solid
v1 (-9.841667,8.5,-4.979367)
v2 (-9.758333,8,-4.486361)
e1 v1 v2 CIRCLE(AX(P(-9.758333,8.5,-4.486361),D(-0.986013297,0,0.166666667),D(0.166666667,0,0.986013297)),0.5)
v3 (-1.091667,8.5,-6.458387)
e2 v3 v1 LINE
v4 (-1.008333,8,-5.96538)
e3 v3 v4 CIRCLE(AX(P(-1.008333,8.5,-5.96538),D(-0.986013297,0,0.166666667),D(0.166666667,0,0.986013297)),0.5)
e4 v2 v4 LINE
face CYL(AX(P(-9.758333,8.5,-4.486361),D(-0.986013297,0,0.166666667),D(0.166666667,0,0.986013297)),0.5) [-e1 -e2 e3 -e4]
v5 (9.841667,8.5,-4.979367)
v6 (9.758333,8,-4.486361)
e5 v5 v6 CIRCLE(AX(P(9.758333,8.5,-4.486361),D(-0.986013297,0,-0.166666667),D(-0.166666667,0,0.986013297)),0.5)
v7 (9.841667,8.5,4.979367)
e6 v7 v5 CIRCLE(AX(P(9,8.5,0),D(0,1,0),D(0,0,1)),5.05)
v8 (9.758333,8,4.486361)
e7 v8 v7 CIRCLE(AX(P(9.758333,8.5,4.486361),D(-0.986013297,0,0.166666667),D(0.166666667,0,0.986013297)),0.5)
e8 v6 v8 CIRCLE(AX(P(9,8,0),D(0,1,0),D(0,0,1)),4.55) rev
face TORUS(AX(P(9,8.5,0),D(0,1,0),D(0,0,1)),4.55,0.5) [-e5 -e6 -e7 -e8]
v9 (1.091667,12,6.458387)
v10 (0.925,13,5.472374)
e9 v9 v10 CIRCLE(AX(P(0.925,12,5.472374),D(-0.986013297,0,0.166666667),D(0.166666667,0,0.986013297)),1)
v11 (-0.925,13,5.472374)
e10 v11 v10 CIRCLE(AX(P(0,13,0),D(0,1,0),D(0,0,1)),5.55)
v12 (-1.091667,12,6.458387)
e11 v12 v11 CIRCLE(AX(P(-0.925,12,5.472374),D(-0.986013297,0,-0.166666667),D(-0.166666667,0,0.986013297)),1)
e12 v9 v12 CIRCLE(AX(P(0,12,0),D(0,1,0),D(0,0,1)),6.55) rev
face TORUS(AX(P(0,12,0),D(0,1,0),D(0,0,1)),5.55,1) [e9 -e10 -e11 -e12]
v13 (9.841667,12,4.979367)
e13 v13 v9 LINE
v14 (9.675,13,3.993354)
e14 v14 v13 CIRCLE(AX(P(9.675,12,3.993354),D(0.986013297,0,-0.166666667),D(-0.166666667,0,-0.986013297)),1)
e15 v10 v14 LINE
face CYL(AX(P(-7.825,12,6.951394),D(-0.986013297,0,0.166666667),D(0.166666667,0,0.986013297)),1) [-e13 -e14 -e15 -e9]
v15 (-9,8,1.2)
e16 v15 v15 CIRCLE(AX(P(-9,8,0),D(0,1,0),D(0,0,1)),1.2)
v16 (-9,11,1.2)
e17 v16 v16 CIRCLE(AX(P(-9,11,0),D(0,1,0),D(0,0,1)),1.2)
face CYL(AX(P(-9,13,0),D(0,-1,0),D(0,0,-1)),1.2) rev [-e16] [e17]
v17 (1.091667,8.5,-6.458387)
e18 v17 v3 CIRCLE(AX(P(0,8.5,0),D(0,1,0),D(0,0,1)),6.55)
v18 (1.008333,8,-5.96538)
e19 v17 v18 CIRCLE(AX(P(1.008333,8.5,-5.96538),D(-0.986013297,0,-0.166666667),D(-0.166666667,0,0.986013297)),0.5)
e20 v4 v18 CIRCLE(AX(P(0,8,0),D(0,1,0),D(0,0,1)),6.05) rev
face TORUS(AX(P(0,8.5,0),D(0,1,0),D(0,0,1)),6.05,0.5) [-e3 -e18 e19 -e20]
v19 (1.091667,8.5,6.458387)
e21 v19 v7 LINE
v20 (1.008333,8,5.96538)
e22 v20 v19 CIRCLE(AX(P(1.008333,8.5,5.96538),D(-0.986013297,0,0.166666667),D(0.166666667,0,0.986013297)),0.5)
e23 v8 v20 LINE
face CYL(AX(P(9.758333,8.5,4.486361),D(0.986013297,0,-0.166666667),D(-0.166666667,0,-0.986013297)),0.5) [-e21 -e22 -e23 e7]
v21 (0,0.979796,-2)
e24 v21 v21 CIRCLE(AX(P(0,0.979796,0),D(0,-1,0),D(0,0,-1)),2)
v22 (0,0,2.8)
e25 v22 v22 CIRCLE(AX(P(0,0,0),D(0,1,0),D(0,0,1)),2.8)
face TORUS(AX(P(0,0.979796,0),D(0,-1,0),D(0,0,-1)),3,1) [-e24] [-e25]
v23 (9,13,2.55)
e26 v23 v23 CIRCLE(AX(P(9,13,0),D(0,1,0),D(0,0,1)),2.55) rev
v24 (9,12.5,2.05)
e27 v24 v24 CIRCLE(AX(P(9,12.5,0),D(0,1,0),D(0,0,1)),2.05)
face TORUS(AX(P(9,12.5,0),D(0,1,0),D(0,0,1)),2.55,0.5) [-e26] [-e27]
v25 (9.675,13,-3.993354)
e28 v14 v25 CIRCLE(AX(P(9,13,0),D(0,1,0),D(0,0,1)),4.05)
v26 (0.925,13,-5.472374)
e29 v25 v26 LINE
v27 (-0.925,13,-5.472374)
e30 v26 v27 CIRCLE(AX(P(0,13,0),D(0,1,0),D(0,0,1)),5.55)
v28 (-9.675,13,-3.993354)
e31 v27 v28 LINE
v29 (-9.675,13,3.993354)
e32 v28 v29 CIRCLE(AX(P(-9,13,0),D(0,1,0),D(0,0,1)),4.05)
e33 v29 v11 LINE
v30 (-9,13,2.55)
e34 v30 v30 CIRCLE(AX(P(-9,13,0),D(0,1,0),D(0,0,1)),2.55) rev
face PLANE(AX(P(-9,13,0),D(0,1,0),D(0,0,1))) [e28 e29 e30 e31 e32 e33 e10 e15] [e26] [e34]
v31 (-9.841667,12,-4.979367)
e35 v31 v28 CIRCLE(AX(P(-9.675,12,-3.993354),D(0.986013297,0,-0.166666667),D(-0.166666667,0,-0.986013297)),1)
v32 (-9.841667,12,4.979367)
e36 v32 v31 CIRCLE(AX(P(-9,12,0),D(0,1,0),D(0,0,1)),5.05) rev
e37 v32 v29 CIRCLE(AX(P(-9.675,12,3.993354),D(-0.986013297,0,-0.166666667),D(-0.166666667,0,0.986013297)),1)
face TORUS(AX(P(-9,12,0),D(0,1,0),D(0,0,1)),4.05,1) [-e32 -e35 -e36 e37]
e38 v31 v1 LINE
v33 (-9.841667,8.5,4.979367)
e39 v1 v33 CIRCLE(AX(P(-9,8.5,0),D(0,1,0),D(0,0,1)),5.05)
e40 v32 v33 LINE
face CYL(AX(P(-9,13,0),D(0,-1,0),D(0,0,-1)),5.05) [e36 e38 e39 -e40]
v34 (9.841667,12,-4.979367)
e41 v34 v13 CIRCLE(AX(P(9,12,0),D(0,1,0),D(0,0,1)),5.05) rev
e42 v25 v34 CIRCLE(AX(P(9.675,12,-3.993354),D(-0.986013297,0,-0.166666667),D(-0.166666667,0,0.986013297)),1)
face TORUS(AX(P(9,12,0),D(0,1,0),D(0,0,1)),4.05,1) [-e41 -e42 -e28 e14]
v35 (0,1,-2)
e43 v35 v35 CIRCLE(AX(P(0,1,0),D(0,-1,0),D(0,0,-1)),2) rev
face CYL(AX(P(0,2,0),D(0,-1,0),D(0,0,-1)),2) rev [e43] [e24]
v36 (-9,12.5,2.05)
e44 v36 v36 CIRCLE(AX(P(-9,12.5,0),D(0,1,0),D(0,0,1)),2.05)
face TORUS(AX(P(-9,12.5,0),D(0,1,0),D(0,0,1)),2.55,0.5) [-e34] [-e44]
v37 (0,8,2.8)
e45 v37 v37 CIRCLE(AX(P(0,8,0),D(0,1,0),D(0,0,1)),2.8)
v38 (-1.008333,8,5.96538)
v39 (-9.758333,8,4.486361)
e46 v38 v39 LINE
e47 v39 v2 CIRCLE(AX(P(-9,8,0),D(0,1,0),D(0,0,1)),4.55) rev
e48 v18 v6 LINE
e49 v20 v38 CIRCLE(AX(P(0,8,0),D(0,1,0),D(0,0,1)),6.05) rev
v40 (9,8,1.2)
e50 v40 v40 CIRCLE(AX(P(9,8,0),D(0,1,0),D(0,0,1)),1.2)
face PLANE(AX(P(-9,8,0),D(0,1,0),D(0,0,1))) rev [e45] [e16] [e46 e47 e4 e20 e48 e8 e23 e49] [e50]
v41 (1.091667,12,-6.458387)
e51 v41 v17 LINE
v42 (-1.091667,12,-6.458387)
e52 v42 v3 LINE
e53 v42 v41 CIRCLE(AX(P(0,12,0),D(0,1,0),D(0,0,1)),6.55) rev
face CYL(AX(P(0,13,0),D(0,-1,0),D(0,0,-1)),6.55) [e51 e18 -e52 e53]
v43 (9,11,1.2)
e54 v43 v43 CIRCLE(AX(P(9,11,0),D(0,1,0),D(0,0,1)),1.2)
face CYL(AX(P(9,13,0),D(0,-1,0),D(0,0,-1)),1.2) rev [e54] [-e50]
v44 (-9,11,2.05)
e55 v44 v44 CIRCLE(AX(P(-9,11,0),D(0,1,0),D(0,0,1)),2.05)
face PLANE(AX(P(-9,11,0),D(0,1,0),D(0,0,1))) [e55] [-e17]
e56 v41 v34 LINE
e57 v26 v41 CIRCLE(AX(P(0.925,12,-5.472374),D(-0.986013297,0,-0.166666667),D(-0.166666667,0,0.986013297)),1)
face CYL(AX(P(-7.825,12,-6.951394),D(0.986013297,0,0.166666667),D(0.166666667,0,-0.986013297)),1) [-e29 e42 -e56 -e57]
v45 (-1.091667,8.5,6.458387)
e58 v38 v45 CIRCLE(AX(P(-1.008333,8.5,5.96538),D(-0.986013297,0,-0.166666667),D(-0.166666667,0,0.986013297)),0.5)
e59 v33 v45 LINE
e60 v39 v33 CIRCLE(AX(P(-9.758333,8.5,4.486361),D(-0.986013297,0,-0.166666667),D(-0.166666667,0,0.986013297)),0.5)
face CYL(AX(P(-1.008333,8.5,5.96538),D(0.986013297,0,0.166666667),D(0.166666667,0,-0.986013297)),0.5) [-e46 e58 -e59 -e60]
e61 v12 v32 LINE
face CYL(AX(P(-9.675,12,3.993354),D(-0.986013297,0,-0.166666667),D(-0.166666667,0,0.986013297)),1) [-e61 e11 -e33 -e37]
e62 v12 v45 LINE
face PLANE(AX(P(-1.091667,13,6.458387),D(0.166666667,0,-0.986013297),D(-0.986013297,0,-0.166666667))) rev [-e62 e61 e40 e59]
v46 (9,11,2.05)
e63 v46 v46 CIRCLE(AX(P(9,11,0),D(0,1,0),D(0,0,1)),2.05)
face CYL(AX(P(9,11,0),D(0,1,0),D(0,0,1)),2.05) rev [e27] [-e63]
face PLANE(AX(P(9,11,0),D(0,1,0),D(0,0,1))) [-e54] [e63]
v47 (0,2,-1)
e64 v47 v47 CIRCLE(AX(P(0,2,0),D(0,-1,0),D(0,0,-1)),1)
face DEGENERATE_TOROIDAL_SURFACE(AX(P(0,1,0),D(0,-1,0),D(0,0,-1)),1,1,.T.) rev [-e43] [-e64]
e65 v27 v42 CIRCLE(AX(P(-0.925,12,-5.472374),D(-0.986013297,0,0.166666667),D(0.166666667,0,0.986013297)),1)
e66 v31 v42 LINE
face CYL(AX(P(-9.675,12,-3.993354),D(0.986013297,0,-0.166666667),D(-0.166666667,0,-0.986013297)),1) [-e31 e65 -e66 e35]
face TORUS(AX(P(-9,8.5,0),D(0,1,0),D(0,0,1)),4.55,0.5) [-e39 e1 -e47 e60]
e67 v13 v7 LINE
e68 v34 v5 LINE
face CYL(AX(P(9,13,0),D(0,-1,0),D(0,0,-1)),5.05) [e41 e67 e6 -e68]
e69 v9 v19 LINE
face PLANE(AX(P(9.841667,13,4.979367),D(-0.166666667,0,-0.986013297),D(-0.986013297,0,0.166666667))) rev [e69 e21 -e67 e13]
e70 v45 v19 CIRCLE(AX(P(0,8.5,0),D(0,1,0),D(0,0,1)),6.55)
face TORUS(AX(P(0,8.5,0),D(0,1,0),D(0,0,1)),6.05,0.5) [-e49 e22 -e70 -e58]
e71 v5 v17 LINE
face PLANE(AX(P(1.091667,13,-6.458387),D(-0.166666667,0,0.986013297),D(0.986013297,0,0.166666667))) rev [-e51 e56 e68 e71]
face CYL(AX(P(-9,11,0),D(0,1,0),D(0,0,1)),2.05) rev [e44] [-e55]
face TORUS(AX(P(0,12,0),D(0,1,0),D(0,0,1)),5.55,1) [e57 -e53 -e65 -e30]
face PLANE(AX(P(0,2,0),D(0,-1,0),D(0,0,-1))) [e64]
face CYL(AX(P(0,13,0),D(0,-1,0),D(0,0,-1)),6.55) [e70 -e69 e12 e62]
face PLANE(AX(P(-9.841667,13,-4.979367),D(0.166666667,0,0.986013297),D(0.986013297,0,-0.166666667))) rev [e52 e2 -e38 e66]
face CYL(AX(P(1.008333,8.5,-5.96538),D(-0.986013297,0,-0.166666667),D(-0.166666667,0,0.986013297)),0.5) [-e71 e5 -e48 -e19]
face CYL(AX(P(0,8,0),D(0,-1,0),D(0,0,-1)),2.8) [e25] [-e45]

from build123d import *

# Parameters (mm, degrees)
SKETCH1_R           = 2.8
BOSS_EXTRUDE1_DEPTH = 8
SKETCH2_R           = 1.2
BOSS_EXTRUDE2_DEPTH = 5
SKETCH3_R           = 2.05
CUT_EXTRUDE1_DEPTH  = 2
FILLET1_R           = 0.5
FILLET2_R           = 1
SKETCH5_R           = 2
CUT_EXTRUDE2_DEPTH  = 2
FILLET3_R           = 1


with BuildPart() as part:
    # Sketch1 → Boss-Extrude1 (new body)
    with BuildSketch(Plane(origin=(0, 0, 0), x_dir=(1, 0, 0), z_dir=(0, 1, 0))):
        with Locations(Location((0, 0, 0), (0, 0, 270))):
            Circle(SKETCH1_R)
    extrude(amount=BOSS_EXTRUDE1_DEPTH)

    # Sketch2 → Boss-Extrude2 (add)
    with BuildSketch(Plane(origin=(0, 8, 0), x_dir=(1, 0, 0), z_dir=(0, 1, 0))):
        with BuildLine():
            Line((-9.841666667, 4.979367151), (-1.091666667, 6.458387097))
            ThreePointArc((-1.091666667, 6.458387097), (0, 6.55), (1.091666667, 6.458387097))
            Line((1.091666667, 6.458387097), (9.841666667, 4.979367151))
            ThreePointArc((9.841666667, 4.979367151), (14.05, 0), (9.841666667, -4.979367151))
            Line((9.841666667, -4.979367151), (1.091666667, -6.458387097))
            ThreePointArc((1.091666667, -6.458387097), (0, -6.55), (-1.091666667, -6.458387097))
            Line((-1.091666667, -6.458387097), (-9.841666667, -4.979367151))
            ThreePointArc((-9.841666667, -4.979367151), (-14.05, 0), (-9.841666667, 4.979367151))
        make_face()
        with Locations(Location((-9, 0, 0), (0, 0, 270))):
            Circle(SKETCH2_R, mode=Mode.SUBTRACT)
        with Locations(Location((9, 0, 0), (0, 0, 270))):
            Circle(SKETCH2_R, mode=Mode.SUBTRACT)
    extrude(amount=BOSS_EXTRUDE2_DEPTH)

    # Sketch3 → Cut-Extrude1 (cut)
    with BuildSketch(Plane(origin=(0, 13, 0), x_dir=(1, 0, 0), z_dir=(0, 1, 0))):
        with Locations(Location((-9, 0, 0), (0, 0, 270))):
            Circle(SKETCH3_R)
        with Locations(Location((9, 0, 0), (0, 0, 270))):
            Circle(SKETCH3_R)
    extrude(amount=-CUT_EXTRUDE1_DEPTH, mode=Mode.SUBTRACT)

    # Fillet1
    fillet1_edges = [part.edges().sort_by_distance(p)[0] for p in [
        (5.466666667, 8, 5.718877124),
        (14.05, 8, 0),
        (5.466666667, 8, -5.718877124),
        (0, 8, -6.55),
        (-5.466666667, 8, -5.718877124),
        (-9, 13, -2.05),
        (9, 13, -2.05),
        (-14.05, 8, 0),
        (-5.466666667, 8, 5.718877124),
        (0, 8, 6.55),
    ]]
    fillet(fillet1_edges, radius=FILLET1_R)

    # Fillet2
    fillet2_edges = [part.edges().sort_by_distance(p)[0] for p in [
        (-14.05, 13, 0),
        (-5.466666667, 13, 5.718877124),
        (0, 13, 6.55),
        (5.466666667, 13, 5.718877124),
        (14.05, 13, 0),
        (5.466666667, 13, -5.718877124),
        (0, 13, -6.55),
        (-5.466666667, 13, -5.718877124),
    ]]
    fillet(fillet2_edges, radius=FILLET2_R)

    # Sketch5 → Cut-Extrude2 (cut)
    with BuildSketch(Plane.XZ):
        with Locations(Location((0, 0, 0), (0, 0, 270))):
            Circle(SKETCH5_R)
    extrude(amount=-CUT_EXTRUDE2_DEPTH, mode=Mode.SUBTRACT)

    # Fillet3
    # the kernel refuses this fillet: 1 mm, written as the material it adds along each edge
    with BuildSketch(Plane(origin=(0, 2, 0), x_dir=(0, 0, -1), z_dir=(-1, 0, 0))) as fillet3_piece_1:
        with BuildLine():
            CenterArc((2 - FILLET3_R, FILLET3_R), FILLET3_R, 270, 90)
            Line((2 - FILLET3_R, 0), (2, 0))
            Line((2, 0), (2, FILLET3_R))
        make_face()
    revolve(axis=Axis((0, 2, 0), (0, -1, 0)))
    # the kernel refuses this fillet: 1 mm, written as the material it takes off along each edge
    with BuildSketch(Plane(origin=(0, 0, 0), x_dir=(0, 0, -1), z_dir=(-1, 0, 0))) as fillet3_2_piece_1:
        with BuildLine():
            CenterArc((3, -0.979795897), FILLET3_R, 101.536959033, 78.463040967)
            Line((2, -0.979795897), (2, 0))
            Line((2, 0), (2.8, 0))
        make_face()
    revolve(axis=Axis((0, 0, 0), (0, -1, 0)), mode=Mode.SUBTRACT)


solid = part.part
